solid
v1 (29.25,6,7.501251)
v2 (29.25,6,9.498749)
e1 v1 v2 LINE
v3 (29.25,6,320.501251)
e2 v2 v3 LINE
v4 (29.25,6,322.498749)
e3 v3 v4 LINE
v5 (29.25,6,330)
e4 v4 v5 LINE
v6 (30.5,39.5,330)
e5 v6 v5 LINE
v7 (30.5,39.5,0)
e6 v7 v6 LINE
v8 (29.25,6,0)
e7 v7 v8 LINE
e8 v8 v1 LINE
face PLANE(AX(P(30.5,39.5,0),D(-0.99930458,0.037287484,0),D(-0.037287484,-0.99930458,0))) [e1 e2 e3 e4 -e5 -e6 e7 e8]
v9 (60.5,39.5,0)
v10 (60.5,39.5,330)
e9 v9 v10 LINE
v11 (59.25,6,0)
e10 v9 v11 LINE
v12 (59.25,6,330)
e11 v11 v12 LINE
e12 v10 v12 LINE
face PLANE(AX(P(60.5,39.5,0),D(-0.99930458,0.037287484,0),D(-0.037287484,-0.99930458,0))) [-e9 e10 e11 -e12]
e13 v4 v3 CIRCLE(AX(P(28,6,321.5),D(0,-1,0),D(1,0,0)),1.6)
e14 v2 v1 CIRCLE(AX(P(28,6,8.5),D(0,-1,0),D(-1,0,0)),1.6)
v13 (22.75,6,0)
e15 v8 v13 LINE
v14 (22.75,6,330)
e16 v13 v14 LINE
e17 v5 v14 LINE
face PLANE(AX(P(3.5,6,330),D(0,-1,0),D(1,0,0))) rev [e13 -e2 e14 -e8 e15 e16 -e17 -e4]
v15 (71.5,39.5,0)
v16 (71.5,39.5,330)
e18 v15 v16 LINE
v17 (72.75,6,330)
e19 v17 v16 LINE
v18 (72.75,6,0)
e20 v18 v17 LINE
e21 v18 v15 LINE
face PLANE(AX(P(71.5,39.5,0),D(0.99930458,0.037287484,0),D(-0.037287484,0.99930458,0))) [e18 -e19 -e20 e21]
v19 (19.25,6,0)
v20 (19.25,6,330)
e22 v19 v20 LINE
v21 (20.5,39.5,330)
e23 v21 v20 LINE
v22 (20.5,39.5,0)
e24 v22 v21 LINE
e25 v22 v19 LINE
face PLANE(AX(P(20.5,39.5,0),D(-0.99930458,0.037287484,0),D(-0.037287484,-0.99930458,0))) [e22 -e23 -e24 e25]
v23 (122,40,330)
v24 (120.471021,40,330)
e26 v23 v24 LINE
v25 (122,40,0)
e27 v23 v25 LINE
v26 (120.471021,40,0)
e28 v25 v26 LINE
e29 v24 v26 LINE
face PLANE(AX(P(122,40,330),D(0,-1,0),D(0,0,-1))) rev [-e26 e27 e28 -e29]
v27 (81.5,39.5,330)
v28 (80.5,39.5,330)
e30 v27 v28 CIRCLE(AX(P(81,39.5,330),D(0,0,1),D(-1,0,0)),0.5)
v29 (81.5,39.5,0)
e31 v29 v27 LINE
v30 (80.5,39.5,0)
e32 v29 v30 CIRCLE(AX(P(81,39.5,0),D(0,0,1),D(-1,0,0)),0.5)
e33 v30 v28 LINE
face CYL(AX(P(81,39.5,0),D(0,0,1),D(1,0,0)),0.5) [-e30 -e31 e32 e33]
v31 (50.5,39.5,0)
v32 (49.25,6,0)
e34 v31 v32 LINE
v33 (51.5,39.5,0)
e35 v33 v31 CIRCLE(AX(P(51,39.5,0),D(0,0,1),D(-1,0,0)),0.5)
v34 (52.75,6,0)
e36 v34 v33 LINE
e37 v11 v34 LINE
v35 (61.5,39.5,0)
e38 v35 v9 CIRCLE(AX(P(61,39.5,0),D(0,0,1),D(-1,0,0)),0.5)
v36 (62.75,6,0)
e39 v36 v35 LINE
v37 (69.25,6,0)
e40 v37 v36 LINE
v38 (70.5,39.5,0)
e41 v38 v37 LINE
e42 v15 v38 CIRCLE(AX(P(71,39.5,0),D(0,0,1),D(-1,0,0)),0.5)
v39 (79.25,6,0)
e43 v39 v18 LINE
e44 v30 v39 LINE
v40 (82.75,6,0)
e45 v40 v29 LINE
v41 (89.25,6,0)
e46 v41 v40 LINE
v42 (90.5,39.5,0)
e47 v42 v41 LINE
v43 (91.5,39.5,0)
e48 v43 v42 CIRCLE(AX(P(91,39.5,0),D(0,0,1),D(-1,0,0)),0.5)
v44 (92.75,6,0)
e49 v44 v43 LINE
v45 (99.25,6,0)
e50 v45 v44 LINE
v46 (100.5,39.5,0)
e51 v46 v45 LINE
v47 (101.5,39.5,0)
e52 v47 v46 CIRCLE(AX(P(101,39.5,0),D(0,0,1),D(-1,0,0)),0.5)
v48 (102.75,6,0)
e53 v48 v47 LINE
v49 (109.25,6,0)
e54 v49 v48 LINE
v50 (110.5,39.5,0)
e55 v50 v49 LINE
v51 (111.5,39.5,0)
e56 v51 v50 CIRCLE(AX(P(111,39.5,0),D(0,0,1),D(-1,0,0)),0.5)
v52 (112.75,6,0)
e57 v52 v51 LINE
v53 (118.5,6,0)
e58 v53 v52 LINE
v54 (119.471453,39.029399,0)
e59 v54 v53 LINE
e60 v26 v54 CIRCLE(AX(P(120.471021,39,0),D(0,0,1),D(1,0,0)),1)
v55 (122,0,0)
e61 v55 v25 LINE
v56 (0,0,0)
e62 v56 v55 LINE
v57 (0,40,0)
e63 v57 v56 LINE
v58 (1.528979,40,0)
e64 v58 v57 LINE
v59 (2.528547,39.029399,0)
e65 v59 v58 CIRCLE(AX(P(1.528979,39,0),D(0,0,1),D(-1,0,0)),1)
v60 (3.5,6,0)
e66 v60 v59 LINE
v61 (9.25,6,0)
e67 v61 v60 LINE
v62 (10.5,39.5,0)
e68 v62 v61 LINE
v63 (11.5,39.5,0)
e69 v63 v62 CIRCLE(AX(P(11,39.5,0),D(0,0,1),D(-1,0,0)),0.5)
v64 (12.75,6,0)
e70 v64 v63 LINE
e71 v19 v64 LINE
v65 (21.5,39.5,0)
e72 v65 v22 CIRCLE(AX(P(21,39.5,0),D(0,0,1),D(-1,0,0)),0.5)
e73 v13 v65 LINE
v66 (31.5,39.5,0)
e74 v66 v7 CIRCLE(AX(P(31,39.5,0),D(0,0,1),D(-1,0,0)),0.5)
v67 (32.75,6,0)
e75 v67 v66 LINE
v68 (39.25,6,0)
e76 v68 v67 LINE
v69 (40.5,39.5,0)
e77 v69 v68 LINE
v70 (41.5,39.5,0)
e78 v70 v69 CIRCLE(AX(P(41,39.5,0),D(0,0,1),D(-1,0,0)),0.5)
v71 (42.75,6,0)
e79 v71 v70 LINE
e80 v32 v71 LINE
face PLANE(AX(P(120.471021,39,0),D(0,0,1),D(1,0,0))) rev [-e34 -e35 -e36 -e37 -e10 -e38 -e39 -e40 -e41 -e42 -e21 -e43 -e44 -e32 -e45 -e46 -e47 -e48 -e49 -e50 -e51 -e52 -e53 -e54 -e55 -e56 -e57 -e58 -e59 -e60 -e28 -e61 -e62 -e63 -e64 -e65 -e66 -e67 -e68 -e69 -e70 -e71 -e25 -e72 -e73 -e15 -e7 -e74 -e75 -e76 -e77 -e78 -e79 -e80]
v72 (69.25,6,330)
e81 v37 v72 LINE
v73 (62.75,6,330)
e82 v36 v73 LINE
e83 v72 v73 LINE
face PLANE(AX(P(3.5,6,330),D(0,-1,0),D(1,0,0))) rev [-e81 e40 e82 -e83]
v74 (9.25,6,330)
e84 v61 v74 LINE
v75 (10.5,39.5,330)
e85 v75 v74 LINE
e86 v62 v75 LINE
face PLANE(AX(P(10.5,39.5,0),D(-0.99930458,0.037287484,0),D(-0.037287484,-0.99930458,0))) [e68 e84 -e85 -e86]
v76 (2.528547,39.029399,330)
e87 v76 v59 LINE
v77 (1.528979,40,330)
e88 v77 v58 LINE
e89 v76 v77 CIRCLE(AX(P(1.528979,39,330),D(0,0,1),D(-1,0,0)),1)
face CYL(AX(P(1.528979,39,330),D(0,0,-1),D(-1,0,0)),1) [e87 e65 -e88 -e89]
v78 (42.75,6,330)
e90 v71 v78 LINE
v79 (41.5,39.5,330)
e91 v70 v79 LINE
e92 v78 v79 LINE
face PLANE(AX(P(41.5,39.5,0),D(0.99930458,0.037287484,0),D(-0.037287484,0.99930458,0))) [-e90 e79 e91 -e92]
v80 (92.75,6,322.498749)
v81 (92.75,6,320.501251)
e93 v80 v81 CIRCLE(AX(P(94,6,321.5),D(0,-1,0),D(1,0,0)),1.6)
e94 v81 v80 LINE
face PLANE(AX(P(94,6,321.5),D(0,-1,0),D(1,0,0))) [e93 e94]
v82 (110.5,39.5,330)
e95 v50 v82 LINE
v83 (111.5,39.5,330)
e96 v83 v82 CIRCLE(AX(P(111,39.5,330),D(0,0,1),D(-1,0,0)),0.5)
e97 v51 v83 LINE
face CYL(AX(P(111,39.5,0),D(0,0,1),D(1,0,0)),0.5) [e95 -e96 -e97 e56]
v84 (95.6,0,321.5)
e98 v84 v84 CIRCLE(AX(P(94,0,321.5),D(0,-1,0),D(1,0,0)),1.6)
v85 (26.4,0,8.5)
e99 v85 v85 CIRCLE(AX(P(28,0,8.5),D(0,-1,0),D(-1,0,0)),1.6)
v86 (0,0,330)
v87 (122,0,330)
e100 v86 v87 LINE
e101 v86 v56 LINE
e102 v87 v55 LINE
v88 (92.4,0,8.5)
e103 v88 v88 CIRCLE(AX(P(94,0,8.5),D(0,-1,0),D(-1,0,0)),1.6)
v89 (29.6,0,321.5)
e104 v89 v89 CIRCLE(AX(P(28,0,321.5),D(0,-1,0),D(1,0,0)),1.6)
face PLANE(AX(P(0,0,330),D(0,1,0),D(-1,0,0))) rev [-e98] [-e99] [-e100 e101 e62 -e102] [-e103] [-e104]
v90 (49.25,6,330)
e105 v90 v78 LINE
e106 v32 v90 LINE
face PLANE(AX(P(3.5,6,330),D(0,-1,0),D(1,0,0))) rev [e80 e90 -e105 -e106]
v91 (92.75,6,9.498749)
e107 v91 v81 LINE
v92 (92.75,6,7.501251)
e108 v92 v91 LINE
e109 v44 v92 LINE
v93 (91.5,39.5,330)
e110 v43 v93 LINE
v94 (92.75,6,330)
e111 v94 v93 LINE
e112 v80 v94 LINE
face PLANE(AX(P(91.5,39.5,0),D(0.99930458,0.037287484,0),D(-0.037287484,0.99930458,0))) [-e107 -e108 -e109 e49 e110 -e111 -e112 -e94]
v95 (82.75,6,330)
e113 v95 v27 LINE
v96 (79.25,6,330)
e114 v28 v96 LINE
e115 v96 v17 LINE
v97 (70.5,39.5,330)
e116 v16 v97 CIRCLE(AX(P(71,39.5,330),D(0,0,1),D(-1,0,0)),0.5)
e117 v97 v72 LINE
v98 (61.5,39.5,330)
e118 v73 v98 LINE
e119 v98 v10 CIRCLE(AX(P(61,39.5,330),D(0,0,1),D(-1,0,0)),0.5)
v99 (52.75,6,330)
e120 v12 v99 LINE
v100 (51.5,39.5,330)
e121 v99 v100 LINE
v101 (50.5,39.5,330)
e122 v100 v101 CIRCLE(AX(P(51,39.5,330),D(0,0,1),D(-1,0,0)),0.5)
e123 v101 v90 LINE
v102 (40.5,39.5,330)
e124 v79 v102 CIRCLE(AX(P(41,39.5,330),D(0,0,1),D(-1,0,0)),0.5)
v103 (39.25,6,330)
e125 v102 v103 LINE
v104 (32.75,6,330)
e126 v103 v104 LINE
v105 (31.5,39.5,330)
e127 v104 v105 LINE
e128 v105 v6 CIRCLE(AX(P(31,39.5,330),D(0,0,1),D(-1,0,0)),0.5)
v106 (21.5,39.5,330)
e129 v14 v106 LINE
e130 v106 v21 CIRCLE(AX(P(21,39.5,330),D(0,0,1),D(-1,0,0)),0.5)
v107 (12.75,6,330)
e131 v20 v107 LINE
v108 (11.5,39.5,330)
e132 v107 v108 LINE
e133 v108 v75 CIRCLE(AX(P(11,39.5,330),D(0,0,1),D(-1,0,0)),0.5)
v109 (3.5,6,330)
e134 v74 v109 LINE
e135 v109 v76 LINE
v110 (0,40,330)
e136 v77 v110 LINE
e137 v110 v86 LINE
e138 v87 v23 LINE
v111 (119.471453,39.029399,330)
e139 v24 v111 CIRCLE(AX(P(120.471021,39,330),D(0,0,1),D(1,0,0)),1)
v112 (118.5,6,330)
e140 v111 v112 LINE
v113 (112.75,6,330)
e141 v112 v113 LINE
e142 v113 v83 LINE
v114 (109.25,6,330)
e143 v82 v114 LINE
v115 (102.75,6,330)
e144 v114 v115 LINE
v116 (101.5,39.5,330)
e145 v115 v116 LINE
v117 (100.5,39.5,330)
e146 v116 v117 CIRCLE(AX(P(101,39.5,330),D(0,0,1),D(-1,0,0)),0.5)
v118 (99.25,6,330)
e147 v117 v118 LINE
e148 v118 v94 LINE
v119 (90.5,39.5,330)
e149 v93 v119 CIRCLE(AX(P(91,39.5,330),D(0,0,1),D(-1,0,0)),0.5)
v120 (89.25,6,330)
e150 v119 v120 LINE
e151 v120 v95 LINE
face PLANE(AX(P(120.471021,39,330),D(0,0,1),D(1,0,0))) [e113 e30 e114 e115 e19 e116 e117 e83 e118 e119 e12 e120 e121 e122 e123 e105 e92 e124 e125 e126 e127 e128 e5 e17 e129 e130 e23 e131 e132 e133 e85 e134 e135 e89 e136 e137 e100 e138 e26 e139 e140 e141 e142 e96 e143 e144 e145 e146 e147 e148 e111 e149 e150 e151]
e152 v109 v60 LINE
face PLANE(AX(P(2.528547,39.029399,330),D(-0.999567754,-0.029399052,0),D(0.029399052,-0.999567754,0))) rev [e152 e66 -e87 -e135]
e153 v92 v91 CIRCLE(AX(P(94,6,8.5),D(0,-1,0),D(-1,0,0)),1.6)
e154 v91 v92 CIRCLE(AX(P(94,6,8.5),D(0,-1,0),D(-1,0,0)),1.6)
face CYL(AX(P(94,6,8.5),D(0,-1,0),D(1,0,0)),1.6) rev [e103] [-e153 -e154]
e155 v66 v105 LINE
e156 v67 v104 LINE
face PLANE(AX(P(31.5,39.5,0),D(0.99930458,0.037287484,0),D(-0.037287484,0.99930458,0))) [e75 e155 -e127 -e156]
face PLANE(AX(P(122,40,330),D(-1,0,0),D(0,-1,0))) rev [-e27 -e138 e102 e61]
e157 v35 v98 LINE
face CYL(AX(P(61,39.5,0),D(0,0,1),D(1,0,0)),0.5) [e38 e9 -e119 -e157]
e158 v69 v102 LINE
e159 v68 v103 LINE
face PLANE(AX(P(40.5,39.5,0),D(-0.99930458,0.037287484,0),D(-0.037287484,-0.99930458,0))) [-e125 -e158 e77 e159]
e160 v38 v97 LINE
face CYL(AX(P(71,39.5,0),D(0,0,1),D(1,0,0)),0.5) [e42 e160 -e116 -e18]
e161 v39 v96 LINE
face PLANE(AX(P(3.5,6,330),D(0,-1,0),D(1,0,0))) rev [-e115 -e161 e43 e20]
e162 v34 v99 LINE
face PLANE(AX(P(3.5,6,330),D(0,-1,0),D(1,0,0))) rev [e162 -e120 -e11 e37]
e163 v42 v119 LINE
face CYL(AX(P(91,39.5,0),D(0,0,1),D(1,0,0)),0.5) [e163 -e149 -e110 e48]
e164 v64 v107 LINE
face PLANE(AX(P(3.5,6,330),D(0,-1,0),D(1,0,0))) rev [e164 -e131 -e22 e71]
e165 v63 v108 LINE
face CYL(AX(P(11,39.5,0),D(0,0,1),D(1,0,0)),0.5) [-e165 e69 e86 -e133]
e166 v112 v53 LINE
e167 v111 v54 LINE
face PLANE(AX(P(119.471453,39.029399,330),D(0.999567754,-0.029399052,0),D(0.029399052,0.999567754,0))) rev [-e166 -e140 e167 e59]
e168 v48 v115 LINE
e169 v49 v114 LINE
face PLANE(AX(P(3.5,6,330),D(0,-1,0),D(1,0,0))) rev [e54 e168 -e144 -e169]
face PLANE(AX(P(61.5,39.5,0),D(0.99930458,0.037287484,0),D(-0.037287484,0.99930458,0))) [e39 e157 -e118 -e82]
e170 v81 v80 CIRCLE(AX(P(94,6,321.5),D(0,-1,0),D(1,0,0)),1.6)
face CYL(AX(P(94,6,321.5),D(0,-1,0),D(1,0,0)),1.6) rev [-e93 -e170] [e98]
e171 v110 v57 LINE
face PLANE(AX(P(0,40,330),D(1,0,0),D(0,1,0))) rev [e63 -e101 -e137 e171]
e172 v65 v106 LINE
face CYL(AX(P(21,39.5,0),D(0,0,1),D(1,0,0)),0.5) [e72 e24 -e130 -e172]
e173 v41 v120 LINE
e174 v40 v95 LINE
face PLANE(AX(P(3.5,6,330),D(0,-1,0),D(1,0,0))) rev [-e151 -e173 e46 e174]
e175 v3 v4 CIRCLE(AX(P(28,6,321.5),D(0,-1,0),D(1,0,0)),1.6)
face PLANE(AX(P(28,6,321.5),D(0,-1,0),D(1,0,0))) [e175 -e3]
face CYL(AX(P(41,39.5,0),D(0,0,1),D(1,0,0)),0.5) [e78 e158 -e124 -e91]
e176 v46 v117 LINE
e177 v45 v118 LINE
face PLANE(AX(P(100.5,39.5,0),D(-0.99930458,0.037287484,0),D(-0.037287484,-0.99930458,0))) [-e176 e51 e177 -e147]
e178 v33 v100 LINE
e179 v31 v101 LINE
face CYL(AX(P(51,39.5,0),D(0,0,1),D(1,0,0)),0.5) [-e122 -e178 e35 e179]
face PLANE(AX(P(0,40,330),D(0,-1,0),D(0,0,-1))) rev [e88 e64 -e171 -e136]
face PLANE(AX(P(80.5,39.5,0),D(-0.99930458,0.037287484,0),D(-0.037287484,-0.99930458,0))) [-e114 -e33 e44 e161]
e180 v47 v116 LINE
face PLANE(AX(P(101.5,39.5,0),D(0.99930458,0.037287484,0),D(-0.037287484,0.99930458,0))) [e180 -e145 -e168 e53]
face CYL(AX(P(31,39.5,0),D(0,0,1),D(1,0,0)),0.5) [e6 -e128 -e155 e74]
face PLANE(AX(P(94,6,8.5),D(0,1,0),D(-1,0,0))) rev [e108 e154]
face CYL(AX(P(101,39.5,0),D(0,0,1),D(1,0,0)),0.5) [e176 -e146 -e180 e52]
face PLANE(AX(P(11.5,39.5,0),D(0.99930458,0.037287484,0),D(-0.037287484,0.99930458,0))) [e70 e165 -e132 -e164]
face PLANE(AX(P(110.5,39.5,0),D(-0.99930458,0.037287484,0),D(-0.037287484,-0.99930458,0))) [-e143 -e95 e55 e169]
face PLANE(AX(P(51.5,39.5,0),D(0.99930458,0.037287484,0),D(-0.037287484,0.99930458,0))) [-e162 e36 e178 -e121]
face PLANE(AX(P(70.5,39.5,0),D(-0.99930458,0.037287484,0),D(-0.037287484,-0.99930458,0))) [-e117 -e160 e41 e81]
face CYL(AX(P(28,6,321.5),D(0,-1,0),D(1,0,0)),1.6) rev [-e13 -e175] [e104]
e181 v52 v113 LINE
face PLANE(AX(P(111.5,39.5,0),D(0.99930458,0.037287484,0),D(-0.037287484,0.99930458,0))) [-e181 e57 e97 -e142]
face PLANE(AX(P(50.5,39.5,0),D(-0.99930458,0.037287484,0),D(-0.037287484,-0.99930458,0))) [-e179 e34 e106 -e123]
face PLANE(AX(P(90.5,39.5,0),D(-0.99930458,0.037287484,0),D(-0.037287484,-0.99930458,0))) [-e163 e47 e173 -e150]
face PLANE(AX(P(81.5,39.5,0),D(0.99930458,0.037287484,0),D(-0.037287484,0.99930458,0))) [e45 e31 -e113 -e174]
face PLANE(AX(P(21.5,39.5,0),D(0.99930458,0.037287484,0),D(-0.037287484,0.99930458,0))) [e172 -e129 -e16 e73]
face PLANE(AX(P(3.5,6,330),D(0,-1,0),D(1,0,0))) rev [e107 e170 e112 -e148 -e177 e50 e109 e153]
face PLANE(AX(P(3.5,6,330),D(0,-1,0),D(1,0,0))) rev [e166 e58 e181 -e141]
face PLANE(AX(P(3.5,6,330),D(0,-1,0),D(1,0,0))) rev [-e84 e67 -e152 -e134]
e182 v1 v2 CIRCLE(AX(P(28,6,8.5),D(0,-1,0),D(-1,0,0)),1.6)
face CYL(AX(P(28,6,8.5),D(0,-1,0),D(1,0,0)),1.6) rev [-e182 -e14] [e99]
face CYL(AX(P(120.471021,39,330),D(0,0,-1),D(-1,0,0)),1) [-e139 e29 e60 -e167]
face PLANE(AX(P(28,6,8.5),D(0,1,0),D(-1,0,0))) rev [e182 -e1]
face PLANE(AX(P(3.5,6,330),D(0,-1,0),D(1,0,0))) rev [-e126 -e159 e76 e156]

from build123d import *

# Parameters (mm, degrees)
EXTRUDE_1_DEPTH       = 330
EXTRUDE_3_DEPTH       = 330
PATTERN_CURVE_1_COUNT = 11
PATTERN_CURVE_1_PITCH = 10
SKETCH_3_R            = 1.6
CUT_EXTRUDE_1_DEPTH   = 6


with BuildPart() as part:
    # Эскиз1 → Вытянуть1 (new body)
    with BuildSketch(Plane.XY):
        with BuildLine():
            Line((0, 40), (1.528979332, 40))
            ThreePointArc((1.528979332, 40), (2.225614441, 39.717425624), (2.528547087, 39.029399052))
            Line((2.528547087, 39.029399052), (3.5, 6))
            Line((3.5, 6), (118.5, 6))
            Line((118.5, 6), (119.471452913, 39.029399052))
            ThreePointArc((119.471452913, 39.029399052), (119.774385559, 39.717425624), (120.471020668, 40))
            Line((120.471020668, 40), (122, 40))
            Line((122, 40), (122, 0))
            Line((122, 0), (0, 0))
            Line((0, 0), (0, 40))
        make_face()
    extrude(amount=EXTRUDE_1_DEPTH)

    # Эскиз2 → Вытянуть3 (add)
    with BuildSketch(Plane.XY.offset(330)):
        with BuildLine():
            Line((10.5, 39.5), (9.25, 6))
            Line((9.25, 6), (12.75, 6))
            Line((12.75, 6), (11.5, 39.5))
            ThreePointArc((11.5, 39.5), (11, 40), (10.5, 39.5))
        make_face()
    extrude_3 = extrude(amount=-EXTRUDE_3_DEPTH)

    # Кривая1: Вытянуть3 ×11
    with Locations(*[(i * PATTERN_CURVE_1_PITCH, 0, 0) for i in range(1, PATTERN_CURVE_1_COUNT)]):
        add(extrude_3)

    # Эскиз3 → Вырез-Вытянуть1 (cut)
    with BuildSketch(Plane.XZ):
        with Locations((28, 321.5)):
            Circle(SKETCH_3_R)
        with Locations((94, 321.5)):
            Circle(SKETCH_3_R)
        with Locations((94, 8.5)):
            Circle(SKETCH_3_R)
        with Locations((28, 8.5)):
            Circle(SKETCH_3_R)
    extrude(amount=-CUT_EXTRUDE_1_DEPTH, mode=Mode.SUBTRACT)


solid = part.part
